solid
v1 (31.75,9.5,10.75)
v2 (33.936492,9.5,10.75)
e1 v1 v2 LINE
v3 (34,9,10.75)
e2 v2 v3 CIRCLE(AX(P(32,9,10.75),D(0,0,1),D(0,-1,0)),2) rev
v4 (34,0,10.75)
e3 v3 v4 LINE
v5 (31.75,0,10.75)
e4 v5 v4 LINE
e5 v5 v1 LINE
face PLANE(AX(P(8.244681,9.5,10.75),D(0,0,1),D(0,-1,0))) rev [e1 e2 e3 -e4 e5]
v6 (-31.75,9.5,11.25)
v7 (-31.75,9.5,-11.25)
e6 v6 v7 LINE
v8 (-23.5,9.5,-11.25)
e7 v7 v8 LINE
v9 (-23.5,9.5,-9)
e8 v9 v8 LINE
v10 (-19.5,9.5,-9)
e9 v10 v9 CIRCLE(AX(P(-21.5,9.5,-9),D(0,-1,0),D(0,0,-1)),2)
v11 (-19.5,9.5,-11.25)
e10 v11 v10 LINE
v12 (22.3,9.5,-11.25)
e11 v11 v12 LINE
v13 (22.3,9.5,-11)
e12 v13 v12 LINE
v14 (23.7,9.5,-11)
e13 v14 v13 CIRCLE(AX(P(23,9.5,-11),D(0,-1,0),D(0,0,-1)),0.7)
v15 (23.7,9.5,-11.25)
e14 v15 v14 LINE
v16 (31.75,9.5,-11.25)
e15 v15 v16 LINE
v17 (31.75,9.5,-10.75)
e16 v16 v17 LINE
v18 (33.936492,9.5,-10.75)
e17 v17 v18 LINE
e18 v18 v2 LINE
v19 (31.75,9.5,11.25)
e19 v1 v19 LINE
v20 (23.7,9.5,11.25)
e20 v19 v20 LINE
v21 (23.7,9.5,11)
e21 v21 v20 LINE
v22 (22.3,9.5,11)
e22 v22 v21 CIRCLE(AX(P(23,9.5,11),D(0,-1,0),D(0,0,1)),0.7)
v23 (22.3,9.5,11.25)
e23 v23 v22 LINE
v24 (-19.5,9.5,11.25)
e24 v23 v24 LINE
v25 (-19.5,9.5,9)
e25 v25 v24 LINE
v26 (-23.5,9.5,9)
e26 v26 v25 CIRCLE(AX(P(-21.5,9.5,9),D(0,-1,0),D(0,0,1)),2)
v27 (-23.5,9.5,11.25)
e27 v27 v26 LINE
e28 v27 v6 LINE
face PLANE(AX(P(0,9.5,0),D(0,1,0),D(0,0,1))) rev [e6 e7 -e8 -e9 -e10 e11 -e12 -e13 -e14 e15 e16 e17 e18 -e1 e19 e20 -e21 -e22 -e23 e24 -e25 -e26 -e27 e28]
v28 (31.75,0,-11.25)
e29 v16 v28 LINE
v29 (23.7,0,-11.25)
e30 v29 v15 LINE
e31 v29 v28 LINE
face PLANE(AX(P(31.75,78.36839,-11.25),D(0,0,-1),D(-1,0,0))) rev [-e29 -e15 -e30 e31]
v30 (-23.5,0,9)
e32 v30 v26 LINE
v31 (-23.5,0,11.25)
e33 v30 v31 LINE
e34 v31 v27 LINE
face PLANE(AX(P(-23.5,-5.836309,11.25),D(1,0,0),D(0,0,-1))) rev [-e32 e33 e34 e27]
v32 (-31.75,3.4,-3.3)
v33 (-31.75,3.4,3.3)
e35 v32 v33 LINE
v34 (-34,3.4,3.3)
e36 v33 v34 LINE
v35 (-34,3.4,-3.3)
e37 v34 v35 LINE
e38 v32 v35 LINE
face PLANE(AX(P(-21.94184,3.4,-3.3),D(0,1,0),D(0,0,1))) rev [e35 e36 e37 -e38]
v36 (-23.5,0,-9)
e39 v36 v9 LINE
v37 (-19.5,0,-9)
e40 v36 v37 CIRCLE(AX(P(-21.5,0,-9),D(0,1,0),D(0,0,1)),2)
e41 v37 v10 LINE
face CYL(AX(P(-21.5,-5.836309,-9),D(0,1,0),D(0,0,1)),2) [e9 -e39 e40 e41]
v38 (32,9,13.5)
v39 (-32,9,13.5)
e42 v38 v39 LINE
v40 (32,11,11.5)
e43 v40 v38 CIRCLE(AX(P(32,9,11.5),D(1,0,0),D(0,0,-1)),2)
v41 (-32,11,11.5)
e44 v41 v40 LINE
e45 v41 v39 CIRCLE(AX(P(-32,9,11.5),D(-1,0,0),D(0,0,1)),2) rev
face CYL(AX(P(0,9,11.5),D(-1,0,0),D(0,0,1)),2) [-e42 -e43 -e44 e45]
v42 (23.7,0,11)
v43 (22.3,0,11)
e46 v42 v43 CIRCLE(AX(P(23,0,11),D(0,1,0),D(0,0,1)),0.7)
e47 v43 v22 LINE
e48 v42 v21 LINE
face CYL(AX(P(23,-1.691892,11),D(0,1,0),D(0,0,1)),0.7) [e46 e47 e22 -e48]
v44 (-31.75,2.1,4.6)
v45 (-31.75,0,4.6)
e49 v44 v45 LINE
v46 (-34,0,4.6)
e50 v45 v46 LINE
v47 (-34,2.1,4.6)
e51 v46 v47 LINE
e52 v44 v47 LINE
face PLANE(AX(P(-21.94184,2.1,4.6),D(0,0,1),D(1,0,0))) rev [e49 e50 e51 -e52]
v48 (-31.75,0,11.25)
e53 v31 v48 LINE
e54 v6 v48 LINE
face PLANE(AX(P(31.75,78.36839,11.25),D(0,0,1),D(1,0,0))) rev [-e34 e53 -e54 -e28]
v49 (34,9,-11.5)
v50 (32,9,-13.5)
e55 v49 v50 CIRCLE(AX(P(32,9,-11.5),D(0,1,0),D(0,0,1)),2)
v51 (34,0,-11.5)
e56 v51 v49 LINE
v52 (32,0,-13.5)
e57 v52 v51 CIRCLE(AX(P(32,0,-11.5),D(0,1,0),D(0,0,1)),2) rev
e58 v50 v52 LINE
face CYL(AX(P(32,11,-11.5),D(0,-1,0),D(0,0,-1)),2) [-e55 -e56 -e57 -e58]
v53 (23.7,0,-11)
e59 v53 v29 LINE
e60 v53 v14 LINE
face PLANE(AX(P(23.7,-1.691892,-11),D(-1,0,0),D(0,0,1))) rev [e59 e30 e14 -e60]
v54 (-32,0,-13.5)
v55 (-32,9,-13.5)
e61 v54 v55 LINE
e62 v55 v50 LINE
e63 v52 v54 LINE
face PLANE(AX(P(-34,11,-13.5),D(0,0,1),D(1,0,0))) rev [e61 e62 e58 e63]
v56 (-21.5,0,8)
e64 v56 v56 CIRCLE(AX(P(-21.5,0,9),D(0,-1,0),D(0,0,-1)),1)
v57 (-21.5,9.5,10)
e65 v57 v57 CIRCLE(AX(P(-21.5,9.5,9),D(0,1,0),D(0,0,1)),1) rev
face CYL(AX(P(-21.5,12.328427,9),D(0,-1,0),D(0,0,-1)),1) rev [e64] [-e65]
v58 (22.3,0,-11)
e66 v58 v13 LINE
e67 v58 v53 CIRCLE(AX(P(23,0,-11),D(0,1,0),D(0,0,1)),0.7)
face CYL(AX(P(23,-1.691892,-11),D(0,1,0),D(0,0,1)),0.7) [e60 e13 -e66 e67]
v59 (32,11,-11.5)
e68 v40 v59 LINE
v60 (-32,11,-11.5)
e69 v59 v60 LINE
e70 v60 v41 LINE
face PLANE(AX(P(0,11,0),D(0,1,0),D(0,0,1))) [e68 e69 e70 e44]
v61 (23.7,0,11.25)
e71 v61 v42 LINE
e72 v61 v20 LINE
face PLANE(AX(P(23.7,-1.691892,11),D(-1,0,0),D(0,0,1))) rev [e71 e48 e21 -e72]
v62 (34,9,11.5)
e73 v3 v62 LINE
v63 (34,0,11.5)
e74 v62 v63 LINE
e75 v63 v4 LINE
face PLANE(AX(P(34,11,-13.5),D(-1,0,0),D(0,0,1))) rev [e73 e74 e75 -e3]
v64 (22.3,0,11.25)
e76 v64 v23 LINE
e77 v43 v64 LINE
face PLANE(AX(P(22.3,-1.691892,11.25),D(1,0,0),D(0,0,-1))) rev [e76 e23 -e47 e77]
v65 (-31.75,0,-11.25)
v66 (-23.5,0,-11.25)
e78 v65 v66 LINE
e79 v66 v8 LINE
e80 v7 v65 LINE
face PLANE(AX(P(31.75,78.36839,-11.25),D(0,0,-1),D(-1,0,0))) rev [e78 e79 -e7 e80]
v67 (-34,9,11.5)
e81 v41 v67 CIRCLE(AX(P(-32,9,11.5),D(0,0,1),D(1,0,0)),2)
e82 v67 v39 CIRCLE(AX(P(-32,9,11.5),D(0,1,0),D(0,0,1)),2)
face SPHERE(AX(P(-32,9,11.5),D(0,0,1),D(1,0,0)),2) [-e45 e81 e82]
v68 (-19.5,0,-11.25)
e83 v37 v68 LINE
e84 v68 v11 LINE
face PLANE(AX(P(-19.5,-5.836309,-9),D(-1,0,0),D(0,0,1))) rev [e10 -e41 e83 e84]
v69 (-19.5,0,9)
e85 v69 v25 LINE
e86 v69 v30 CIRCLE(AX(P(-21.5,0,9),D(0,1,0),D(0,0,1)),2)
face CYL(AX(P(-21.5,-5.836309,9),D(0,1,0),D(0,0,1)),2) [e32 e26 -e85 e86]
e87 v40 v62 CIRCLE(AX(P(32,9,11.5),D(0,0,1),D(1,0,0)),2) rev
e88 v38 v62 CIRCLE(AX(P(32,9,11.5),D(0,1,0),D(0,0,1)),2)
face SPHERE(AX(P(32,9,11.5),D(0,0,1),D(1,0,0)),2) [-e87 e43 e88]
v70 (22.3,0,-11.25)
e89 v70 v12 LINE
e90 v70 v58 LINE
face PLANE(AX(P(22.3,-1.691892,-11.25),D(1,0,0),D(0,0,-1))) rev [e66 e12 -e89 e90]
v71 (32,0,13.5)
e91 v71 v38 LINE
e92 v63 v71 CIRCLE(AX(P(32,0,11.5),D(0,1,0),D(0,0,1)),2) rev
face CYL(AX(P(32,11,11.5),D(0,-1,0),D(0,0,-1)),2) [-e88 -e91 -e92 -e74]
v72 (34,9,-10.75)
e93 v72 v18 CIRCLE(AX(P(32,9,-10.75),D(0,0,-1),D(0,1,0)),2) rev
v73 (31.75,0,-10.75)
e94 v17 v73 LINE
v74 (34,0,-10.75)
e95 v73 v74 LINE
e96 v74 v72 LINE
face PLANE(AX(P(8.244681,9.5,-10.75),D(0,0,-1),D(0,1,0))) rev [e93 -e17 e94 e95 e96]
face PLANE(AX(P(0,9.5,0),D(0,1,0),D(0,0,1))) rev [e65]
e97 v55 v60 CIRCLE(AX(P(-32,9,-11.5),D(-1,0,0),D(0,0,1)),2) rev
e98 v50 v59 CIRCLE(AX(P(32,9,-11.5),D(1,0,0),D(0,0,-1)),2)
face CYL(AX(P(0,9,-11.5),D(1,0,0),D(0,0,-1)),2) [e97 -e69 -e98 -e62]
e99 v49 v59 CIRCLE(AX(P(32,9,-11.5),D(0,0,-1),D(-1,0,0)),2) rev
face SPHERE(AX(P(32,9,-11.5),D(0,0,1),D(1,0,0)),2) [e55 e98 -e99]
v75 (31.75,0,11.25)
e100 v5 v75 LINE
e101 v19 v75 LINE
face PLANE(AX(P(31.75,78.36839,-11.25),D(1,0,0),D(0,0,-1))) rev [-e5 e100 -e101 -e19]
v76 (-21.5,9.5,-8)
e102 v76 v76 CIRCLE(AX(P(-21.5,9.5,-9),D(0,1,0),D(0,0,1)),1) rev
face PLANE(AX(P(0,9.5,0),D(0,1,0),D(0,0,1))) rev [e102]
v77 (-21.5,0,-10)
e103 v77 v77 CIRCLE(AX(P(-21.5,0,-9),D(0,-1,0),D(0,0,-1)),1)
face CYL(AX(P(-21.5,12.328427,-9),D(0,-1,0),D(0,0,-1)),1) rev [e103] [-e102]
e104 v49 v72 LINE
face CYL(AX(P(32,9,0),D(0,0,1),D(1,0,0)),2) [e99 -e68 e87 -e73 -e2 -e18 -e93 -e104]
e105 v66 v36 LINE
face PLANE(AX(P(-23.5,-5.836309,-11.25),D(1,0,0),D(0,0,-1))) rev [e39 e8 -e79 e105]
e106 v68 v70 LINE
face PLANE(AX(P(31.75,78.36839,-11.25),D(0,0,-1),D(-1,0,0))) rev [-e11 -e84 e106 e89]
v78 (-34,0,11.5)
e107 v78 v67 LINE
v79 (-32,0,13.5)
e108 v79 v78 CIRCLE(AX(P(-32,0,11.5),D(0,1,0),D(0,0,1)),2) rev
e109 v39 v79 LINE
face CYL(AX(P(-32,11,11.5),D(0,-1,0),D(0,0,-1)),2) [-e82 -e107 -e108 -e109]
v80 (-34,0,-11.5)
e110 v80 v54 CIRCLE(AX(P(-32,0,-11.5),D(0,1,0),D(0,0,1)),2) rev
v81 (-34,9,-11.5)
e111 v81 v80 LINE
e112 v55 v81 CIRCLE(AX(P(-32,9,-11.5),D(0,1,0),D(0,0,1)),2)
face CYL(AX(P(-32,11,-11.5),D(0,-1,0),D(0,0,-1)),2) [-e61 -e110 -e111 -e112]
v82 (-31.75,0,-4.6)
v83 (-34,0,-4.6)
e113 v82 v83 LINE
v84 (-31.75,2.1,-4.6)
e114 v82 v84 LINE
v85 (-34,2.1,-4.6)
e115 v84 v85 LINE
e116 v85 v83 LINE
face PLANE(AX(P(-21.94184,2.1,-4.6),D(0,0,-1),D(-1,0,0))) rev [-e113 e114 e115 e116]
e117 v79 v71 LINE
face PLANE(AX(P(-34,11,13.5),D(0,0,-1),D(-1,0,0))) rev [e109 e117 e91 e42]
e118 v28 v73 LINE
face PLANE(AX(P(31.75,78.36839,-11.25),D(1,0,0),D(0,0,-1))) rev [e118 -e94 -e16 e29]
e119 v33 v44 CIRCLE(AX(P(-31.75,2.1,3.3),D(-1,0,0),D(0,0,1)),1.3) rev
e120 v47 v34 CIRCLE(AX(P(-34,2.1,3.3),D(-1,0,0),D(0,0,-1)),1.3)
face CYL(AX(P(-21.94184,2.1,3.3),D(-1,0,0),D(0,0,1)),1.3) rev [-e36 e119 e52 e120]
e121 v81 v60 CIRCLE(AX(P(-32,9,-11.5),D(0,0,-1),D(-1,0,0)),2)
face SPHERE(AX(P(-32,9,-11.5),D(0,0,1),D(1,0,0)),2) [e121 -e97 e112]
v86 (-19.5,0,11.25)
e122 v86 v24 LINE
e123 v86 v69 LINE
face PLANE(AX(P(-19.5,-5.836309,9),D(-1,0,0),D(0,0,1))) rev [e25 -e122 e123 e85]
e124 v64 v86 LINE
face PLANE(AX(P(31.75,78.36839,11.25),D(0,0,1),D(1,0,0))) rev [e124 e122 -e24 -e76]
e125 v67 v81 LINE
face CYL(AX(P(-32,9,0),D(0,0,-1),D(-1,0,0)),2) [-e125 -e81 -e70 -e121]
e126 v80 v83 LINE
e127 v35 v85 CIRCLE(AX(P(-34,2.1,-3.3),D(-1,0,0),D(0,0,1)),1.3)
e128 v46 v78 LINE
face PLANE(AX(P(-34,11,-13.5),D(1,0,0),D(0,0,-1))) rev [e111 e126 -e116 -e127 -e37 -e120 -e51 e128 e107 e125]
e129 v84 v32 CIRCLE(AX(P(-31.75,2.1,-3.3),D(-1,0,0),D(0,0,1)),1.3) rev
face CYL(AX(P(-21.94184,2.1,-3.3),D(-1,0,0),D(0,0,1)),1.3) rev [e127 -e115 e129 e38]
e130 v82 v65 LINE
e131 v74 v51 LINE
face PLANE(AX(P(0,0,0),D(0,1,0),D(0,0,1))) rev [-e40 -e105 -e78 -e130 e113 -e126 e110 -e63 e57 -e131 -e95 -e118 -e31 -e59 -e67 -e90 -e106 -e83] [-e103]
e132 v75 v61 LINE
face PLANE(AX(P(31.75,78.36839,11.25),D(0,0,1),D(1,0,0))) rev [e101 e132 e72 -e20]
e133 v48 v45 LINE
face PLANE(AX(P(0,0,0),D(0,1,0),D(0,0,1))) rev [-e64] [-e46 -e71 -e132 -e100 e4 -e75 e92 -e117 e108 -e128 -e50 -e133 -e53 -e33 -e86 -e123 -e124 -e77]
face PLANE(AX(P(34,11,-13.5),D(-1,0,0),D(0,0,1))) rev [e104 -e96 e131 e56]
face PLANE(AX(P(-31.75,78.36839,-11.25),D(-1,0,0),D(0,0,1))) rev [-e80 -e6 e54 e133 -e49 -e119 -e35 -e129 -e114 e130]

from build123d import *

# Parameters (mm, degrees)
SKETCH_1_W          = 68
SKETCH_1_H          = 27
EXTRUDE_1_DEPTH     = 11
SKETCH_2_W          = 63.5
SKETCH_2_H          = 22.5
CUT_EXTRUDE_1_DEPTH = 9.5
CUT_EXTRUDE_2_DEPTH = 2.25
SKETCH_4_W          = 21.5
SKETCH_4_H          = 9.5
CUT_EXTRUDE_3_DEPTH = 2.25
EXTRUDE_2_DEPTH     = 9.5
EXTRUDE_3_DEPTH     = 9.5
SKETCH_7_R          = 1
CUT_EXTRUDE_4_DEPTH = 9.5
FILLET_1_R          = 2


with BuildPart() as part:
    # Эскиз1 → Бобышка-Вытянуть1 (new body)
    with BuildSketch(Plane(origin=(0, 0, 0), x_dir=(1, 0, 0), z_dir=(0, 1, 0))):
        Rectangle(SKETCH_1_W, SKETCH_1_H)
    extrude(amount=EXTRUDE_1_DEPTH)

    # Эскиз2 → Вырез-Вытянуть1 (cut)
    with BuildSketch(Plane.XZ):
        Rectangle(SKETCH_2_W, SKETCH_2_H)
    extrude(amount=-CUT_EXTRUDE_1_DEPTH, mode=Mode.SUBTRACT)

    # Эскиз3 → Вырез-Вытянуть2 (cut)
    with BuildSketch(Plane.ZY.offset(34)):
        with BuildLine():
            Line((-4.6, 2.1), (-4.6, 0))
            Line((-4.6, 0), (4.6, 0))
            Line((4.6, 0), (4.6, 2.1))
            ThreePointArc((4.6, 2.1), (4.219238816, 3.019238816), (3.3, 3.4))
            Line((3.3, 3.4), (-3.3, 3.4))
            ThreePointArc((-3.3, 3.4), (-4.219238816, 3.019238816), (-4.6, 2.1))
        make_face()
    extrude(amount=-CUT_EXTRUDE_2_DEPTH, mode=Mode.SUBTRACT)

    # Эскиз4 → Вырез-Вытянуть3 (cut)
    with BuildSketch(Plane(origin=(34, 0, 0), x_dir=(0, 0, -1), z_dir=(1, 0, 0))):
        with Locations((0, 4.75)):
            Rectangle(SKETCH_4_W, SKETCH_4_H)
    extrude(amount=-CUT_EXTRUDE_3_DEPTH, mode=Mode.SUBTRACT)

    # Эскиз5 → Бобышка-Вытянуть2 (add)
    with BuildSketch(Plane.XZ.offset(-9.5)):
        with BuildLine():
            Line((-19.5, -9), (-19.5, -11.25))
            Line((-19.5, -11.25), (-23.5, -11.25))
            Line((-23.5, -11.25), (-23.5, -9))
            ThreePointArc((-23.5, -9), (-21.5, -7), (-19.5, -9))
        make_face()
        with BuildLine():
            Line((-23.5, 11.25), (-23.5, 9))
            ThreePointArc((-23.5, 9), (-21.5, 7), (-19.5, 9))
            Line((-19.5, 9), (-19.5, 11.25))
            Line((-19.5, 11.25), (-23.5, 11.25))
        make_face()
    extrude(amount=EXTRUDE_2_DEPTH)

    # Эскиз6 → Бобышка-Вытянуть3 (add)
    with BuildSketch(Plane.XZ.offset(-9.5)):
        with BuildLine():
            Line((23.7, -11), (23.7, -11.25))
            Line((23.7, -11.25), (22.3, -11.25))
            Line((22.3, -11.25), (22.3, -11))
            ThreePointArc((22.3, -11), (23, -10.3), (23.7, -11))
        make_face()
        with BuildLine():
            Line((22.3, 11.25), (22.3, 11))
            ThreePointArc((22.3, 11), (23, 10.3), (23.7, 11))
            Line((23.7, 11), (23.7, 11.25))
            Line((23.7, 11.25), (22.3, 11.25))
        make_face()
    extrude(amount=EXTRUDE_3_DEPTH)

    # Эскиз7 → Вырез-Вытянуть4 (cut)
    with BuildSketch(Plane.XZ):
        with Locations(Location((-21.5, -9, 0), (0, 0, 270))):
            Circle(SKETCH_7_R)
        with Locations(Location((-21.5, 9, 0), (0, 0, 270))):
            Circle(SKETCH_7_R)
    extrude(amount=-CUT_EXTRUDE_4_DEPTH, mode=Mode.SUBTRACT)

    # Скругление1
    # the kernel refuses this fillet: 2 mm, written as the material it takes off along each edge
    with BuildSketch(Plane(origin=(32, 9, -11.5), x_dir=(1, 0, 0), z_dir=(0, 0, -1))) as fillet_1_piece_1_section:
        Polygon((0, 0), (FILLET_1_R, 0), (FILLET_1_R, -FILLET_1_R), (0, -FILLET_1_R), align=None)
    fillet_1_piece_1 = extrude(amount=FILLET_1_R, mode=Mode.PRIVATE)
    fillet_1_piece_1 = fillet_1_piece_1 - Plane(origin=(32, 9, -11.5), x_dir=(-0.7071067811865475, -0.7071067811865475, 0), z_dir=(0, 0, -1)) * Sphere(FILLET_1_R, mode=Mode.PRIVATE)
    add(fillet_1_piece_1, mode=Mode.SUBTRACT)
    with BuildSketch(Plane(origin=(32, 9, 11.5), x_dir=(0, 0, 1), z_dir=(1, 0, 0))) as fillet_1_piece_2_section:
        Polygon((0, 0), (FILLET_1_R, 0), (FILLET_1_R, -FILLET_1_R), (0, -FILLET_1_R), align=None)
    fillet_1_piece_2 = extrude(amount=FILLET_1_R, mode=Mode.PRIVATE)
    fillet_1_piece_2 = fillet_1_piece_2 - Plane(origin=(32, 9, 11.5), x_dir=(0, -0.7071067811865475, -0.7071067811865475), z_dir=(1, 0, 0)) * Sphere(FILLET_1_R, mode=Mode.PRIVATE)
    add(fillet_1_piece_2, mode=Mode.SUBTRACT)
    with BuildSketch(Plane(origin=(-32, 9, 11.5), x_dir=(0, 0, 1), z_dir=(-1, 0, 0))) as fillet_1_piece_3_section:
        Polygon((0, 0), (FILLET_1_R, 0), (FILLET_1_R, FILLET_1_R), (0, FILLET_1_R), align=None)
    fillet_1_piece_3 = extrude(amount=FILLET_1_R, mode=Mode.PRIVATE)
    fillet_1_piece_3 = fillet_1_piece_3 - Plane(origin=(-32, 9, 11.5), x_dir=(0, -0.7071067811865475, -0.7071067811865475), z_dir=(-1, 0, 0)) * Sphere(FILLET_1_R, mode=Mode.PRIVATE)
    add(fillet_1_piece_3, mode=Mode.SUBTRACT)
    with BuildSketch(Plane(origin=(-32, 9, -11.5), x_dir=(-1, 0, 0), z_dir=(0, 0, -1))) as fillet_1_piece_4_section:
        Polygon((0, 0), (FILLET_1_R, 0), (FILLET_1_R, FILLET_1_R), (0, FILLET_1_R), align=None)
    fillet_1_piece_4 = extrude(amount=FILLET_1_R, mode=Mode.PRIVATE)
    fillet_1_piece_4 = fillet_1_piece_4 - Plane(origin=(-32, 9, -11.5), x_dir=(0.7071067811865475, -0.7071067811865475, 0), z_dir=(0, 0, -1)) * Sphere(FILLET_1_R, mode=Mode.PRIVATE)
    add(fillet_1_piece_4, mode=Mode.SUBTRACT)
    with BuildSketch(Plane(origin=(34, 11, -11.5), x_dir=(0, -1, 0), z_dir=(0, 0, 1)), Plane(origin=(-34, 11, 11.5), x_dir=(0, -1, 0), z_dir=(0, 0, -1))) as fillet_1_piece_5:
        with BuildLine():
            CenterArc((FILLET_1_R, -FILLET_1_R), FILLET_1_R, 90, 90)
            Line((0, -FILLET_1_R), (0, 0))
            Line((0, 0), (FILLET_1_R, 0))
        make_face()
    extrude(amount=23, mode=Mode.SUBTRACT)
    with BuildSketch(Plane(origin=(34, -5, 13.5), x_dir=(0, 0, -1), z_dir=(0, 1, 0)), Plane(origin=(34, -5, -13.5), x_dir=(-1, 0, 0), z_dir=(0, 1, 0))) as fillet_1_piece_6:
        with BuildLine():
            CenterArc((FILLET_1_R, FILLET_1_R), FILLET_1_R, 180, 90)
            Line((0, FILLET_1_R), (0, 0))
            Line((0, 0), (FILLET_1_R, 0))
        make_face()
    extrude(amount=14, mode=Mode.SUBTRACT)
    with BuildSketch(Plane(origin=(32, 11, 13.5), x_dir=(0, 0, -1), z_dir=(-1, 0, 0))) as fillet_1_piece_7:
        with BuildLine():
            CenterArc((FILLET_1_R, FILLET_1_R), FILLET_1_R, 180, 90)
            Line((0, FILLET_1_R), (0, 0))
            Line((0, 0), (FILLET_1_R, 0))
        make_face()
    extrude(amount=64, mode=Mode.SUBTRACT)
    with BuildSketch(Plane(origin=(-34, -5, 13.5), x_dir=(0, 0, -1), z_dir=(0, 1, 0)), Plane(origin=(-34, -5, -13.5), x_dir=(1, 0, 0), z_dir=(0, 1, 0))) as fillet_1_piece_8:
        with BuildLine():
            CenterArc((FILLET_1_R, -FILLET_1_R), FILLET_1_R, 90, 90)
            Line((0, -FILLET_1_R), (0, 0))
            Line((0, 0), (FILLET_1_R, 0))
        make_face()
    extrude(amount=14, mode=Mode.SUBTRACT)
    with BuildSketch(Plane(origin=(-32, 11, -13.5), x_dir=(0, -1, 0), z_dir=(1, 0, 0))) as fillet_1_piece_9:
        with BuildLine():
            CenterArc((FILLET_1_R, -FILLET_1_R), FILLET_1_R, 90, 90)
            Line((0, -FILLET_1_R), (0, 0))
            Line((0, 0), (FILLET_1_R, 0))
        make_face()
    extrude(amount=64, mode=Mode.SUBTRACT)


solid = part.part
